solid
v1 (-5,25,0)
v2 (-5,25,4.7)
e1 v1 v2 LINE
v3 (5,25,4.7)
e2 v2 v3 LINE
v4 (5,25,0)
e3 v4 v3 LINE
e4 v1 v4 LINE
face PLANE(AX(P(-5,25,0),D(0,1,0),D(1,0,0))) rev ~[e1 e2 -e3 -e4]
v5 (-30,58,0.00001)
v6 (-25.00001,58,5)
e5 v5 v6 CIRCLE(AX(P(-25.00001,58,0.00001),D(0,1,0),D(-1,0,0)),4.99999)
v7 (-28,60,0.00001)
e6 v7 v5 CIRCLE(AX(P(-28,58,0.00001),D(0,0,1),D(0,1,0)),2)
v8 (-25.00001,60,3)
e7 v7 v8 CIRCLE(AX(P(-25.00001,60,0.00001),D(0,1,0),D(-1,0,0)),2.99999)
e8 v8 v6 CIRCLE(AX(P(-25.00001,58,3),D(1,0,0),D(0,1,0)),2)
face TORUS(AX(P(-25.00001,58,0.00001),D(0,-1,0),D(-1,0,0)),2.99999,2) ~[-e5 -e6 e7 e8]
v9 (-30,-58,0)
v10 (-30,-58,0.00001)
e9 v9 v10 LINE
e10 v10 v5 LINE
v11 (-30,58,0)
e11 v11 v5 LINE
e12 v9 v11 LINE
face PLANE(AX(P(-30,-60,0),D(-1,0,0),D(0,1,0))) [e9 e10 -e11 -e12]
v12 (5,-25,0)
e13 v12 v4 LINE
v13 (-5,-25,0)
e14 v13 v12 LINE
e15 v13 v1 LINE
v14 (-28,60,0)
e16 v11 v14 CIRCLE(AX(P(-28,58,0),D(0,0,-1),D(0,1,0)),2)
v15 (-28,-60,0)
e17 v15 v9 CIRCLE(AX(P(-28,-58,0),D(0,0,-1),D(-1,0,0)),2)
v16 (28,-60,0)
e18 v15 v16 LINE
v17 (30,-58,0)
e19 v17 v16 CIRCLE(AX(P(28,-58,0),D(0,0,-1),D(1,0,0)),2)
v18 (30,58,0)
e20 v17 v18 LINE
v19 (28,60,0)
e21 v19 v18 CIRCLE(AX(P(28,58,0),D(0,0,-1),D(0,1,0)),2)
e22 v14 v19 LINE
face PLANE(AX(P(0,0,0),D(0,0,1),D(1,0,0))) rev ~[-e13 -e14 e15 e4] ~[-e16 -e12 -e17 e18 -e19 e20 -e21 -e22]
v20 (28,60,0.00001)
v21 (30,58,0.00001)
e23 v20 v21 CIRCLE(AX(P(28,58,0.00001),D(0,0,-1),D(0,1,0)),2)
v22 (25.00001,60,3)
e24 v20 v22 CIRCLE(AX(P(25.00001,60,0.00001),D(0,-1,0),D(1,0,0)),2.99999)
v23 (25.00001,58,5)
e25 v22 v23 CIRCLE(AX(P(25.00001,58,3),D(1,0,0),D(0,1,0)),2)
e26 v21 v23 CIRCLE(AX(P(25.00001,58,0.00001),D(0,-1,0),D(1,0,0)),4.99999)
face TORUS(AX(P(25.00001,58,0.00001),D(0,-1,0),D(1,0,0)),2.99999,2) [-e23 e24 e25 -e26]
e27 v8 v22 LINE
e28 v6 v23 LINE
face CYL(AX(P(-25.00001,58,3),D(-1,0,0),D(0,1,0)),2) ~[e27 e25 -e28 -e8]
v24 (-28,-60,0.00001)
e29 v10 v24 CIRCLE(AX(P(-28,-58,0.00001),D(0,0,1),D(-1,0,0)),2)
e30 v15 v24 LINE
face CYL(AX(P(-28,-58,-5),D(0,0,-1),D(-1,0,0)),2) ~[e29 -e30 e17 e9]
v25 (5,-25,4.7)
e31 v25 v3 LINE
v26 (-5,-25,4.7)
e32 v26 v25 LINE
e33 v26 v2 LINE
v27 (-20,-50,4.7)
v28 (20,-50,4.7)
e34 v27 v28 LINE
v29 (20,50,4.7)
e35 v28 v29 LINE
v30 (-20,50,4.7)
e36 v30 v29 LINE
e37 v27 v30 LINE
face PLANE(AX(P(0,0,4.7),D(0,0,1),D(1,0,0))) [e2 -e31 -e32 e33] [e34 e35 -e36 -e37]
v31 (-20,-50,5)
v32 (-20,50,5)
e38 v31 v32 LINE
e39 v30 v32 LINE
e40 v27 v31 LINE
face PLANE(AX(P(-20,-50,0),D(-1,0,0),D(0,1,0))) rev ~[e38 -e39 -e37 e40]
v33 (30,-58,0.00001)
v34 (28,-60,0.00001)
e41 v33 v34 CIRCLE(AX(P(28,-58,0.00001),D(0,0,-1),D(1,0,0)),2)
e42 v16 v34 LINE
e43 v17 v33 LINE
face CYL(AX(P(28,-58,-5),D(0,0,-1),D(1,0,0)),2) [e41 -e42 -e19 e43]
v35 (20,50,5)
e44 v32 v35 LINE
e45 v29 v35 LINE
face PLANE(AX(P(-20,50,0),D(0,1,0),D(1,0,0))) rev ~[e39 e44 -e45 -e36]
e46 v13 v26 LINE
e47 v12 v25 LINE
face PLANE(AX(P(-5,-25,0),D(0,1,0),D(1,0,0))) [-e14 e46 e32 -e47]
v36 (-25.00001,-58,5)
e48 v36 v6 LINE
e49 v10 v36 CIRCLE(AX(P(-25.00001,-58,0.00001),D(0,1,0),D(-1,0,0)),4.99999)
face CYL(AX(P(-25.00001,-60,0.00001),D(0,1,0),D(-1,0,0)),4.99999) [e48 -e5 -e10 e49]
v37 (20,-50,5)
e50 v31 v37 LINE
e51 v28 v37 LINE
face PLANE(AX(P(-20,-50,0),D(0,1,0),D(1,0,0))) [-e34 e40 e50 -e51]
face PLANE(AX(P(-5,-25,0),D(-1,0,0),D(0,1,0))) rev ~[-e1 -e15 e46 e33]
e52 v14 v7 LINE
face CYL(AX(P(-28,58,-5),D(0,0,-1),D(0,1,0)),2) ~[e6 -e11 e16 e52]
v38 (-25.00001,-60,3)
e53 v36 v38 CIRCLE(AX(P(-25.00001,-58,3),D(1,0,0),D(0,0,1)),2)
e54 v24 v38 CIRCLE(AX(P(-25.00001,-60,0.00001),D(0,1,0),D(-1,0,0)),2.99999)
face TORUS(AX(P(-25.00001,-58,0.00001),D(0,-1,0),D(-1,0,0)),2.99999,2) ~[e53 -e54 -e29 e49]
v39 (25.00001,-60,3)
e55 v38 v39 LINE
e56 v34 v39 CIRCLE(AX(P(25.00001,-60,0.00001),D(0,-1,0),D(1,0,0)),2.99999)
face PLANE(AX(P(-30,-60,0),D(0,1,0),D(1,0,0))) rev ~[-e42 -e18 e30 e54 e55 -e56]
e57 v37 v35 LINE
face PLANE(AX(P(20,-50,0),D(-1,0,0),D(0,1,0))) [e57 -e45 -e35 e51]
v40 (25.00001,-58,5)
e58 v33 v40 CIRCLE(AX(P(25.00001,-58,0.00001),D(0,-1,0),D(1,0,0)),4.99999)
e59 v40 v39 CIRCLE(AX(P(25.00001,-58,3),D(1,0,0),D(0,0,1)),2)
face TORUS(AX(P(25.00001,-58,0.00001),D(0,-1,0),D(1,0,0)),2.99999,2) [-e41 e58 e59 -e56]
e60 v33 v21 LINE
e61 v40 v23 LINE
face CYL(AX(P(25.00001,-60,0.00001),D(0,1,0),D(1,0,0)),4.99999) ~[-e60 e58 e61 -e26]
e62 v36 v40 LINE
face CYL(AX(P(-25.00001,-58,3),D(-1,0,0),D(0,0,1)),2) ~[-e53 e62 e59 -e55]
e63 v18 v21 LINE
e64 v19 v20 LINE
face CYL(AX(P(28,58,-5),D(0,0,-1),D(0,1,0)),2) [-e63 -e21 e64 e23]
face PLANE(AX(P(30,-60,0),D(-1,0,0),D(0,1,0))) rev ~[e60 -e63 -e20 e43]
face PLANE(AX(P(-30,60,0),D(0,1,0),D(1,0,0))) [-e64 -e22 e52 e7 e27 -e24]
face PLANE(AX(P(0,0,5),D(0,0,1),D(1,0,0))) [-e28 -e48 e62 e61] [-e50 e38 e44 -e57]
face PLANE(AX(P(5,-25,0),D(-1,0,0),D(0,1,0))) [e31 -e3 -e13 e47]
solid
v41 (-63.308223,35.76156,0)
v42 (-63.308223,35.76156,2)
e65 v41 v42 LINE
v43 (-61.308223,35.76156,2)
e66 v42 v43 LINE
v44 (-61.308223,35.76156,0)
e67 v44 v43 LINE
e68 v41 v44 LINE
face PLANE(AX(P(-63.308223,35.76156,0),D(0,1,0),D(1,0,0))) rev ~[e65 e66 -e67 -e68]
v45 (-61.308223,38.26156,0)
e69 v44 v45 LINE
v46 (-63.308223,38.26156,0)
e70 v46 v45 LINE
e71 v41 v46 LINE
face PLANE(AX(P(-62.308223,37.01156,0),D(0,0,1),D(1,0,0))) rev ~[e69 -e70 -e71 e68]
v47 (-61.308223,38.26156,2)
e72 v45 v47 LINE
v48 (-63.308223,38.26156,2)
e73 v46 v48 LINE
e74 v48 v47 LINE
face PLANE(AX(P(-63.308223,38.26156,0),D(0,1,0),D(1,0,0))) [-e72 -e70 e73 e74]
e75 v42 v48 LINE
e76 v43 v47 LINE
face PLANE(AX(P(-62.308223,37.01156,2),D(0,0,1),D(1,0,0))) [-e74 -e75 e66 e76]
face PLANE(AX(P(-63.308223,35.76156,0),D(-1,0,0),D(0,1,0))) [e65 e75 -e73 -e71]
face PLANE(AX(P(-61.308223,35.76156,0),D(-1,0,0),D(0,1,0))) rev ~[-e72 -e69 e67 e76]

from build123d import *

# Parameters (mm, degrees)
F0_W         = 60
F0_H         = 120
F0_W_2       = 40
F0_H_2       = 100
F1_DEPTH     = 5
F2_R         = 4.99999
F3_T1_DEPTH  = 50.00002
F3_T3_DEPTH  = 5.00001
F3_T6_ANGLE  = 90
F3_T8_ANGLE  = 90
F3_T10_ANGLE = 90
F3_T12_ANGLE = 90
F0_W_3       = 10
F0_H_3       = 50
F4_DEPTH     = 4.7
F5_W         = 2
F5_H         = 2.5
F6_DEPTH     = 2


# Not quite as in the source:
# - a fillet or chamfer that OpenCascade refuses, or shapes differently, is made with other operations: its cross-section is extruded or revolved along the edge and cut away or added
# - a fillet or chamfer is up to 0.001 mm smaller than in the source, because OpenCascade refuses the exact size


with BuildPart() as f1:
    # F0 (on Top) → F1 (new body)
    with BuildSketch(Plane.XY):
        Rectangle(F0_W, F0_H)
        Rectangle(F0_W_2, F0_H_2, mode=Mode.SUBTRACT)
    extrude(amount=F1_DEPTH)

    # F2 (radius 5 in the source; OpenCascade refuses exactly that, so slightly less here)
    f2_edges = [f1.edges().sort_by_distance(p)[0] for p in [
        (-30, 0, 5),
        (30, 0, 5),
    ]]
    fillet(f2_edges, radius=F2_R)

    # F3: fillet of radius 2 on 2 edges, made by hand

    # F3_s2 → F3_t1 (cut)
    with BuildSketch(Plane.YZ.offset(-25.00001)):
        with BuildLine():
            ThreePointArc((60, 3), (59.4142135624, 4.4142135624), (58, 5))
            Line((58, 5), (60, 5))
            Line((60, 5), (60, 3))
        make_face()
        with BuildLine():
            ThreePointArc((-58, 5), (-59.4142135624, 4.4142135624), (-60, 3))
            Line((-60, 3), (-60, 5))
            Line((-60, 5), (-58, 5))
        make_face()
    extrude(amount=F3_T1_DEPTH, mode=Mode.SUBTRACT)

    # F3_s4 → F3_t3 (cut)
    with BuildSketch(Plane.XY.offset(-5)):
        with BuildLine():
            ThreePointArc((30, -58), (29.4142135624, -59.4142135624), (28, -60))
            Line((28, -60), (30, -60))
            Line((30, -60), (30, -58))
        make_face()
        with BuildLine():
            ThreePointArc((-30, -58), (-29.4142135624, -59.4142135624), (-28, -60))
            Line((-28, -60), (-30, -60))
            Line((-30, -60), (-30, -58))
        make_face()
        with BuildLine():
            ThreePointArc((-28, 60), (-29.4142135624, 59.4142135624), (-30, 58))
            Line((-30, 58), (-30, 60))
            Line((-30, 60), (-28, 60))
        make_face()
        with BuildLine():
            ThreePointArc((28, 60), (29.4142135624, 59.4142135624), (30, 58))
            Line((30, 58), (30, 60))
            Line((30, 60), (28, 60))
        make_face()
    extrude(amount=F3_T3_DEPTH, mode=Mode.SUBTRACT)

    # F3_s5 → F3_t6 (revolve, cut)
    with BuildSketch(Plane.XY.offset(1e-05)):
        with BuildLine():
            ThreePointArc((-30, -58), (-29.4142135624, -59.4142135624), (-28, -60))
            Line((-28, -60), (-30, -60))
            Line((-30, -60), (-30, -58))
        make_face()
    revolve(axis=Axis((-25.00001, -60, 1e-05), (0, 1, 0)), revolution_arc=F3_T6_ANGLE, mode=Mode.SUBTRACT)

    # F3_s7 → F3_t8 (revolve, cut)
    with BuildSketch(Plane.XY.offset(1e-05)):
        with BuildLine():
            ThreePointArc((30, -58), (29.4142135624, -59.4142135624), (28, -60))
            Line((28, -60), (30, -60))
            Line((30, -60), (30, -58))
        make_face()
    revolve(axis=Axis((25.00001, -60, 1e-05), (0, -1, 0)), revolution_arc=F3_T8_ANGLE, mode=Mode.SUBTRACT)

    # F3_s9 → F3_t10 (revolve, cut)
    with BuildSketch(Plane.XY.offset(1e-05)):
        with BuildLine():
            ThreePointArc((28, 60), (29.4142135624, 59.4142135624), (30, 58))
            Line((30, 58), (30, 60))
            Line((30, 60), (28, 60))
        make_face()
    revolve(axis=Axis((25.00001, 60, 1e-05), (0, -1, 0)), revolution_arc=F3_T10_ANGLE, mode=Mode.SUBTRACT)

    # F3_s11 → F3_t12 (revolve, cut)
    with BuildSketch(Plane.XY.offset(1e-05)):
        with BuildLine():
            ThreePointArc((-28, 60), (-29.4142135624, 59.4142135624), (-30, 58))
            Line((-30, 58), (-30, 60))
            Line((-30, 60), (-28, 60))
        make_face()
    revolve(axis=Axis((-25.00001, 60, 1e-05), (0, 1, 0)), revolution_arc=F3_T12_ANGLE, mode=Mode.SUBTRACT)

    # F0 (on Top) → F4 (join)
    with BuildSketch(Plane.XY):
        Rectangle(F0_W_2, F0_H_2)
        Rectangle(F0_W_3, F0_H_3, mode=Mode.SUBTRACT)
    extrude(amount=F4_DEPTH)


with BuildPart() as f6:
    # F5 (on Top) → F6 (new body)
    with BuildSketch(Plane.XY):
        with Locations((-62.3082230687, 37.0115598826)):
            Rectangle(F5_W, F5_H)
    extrude(amount=F6_DEPTH)


solid = Compound([f1.part, f6.part])
